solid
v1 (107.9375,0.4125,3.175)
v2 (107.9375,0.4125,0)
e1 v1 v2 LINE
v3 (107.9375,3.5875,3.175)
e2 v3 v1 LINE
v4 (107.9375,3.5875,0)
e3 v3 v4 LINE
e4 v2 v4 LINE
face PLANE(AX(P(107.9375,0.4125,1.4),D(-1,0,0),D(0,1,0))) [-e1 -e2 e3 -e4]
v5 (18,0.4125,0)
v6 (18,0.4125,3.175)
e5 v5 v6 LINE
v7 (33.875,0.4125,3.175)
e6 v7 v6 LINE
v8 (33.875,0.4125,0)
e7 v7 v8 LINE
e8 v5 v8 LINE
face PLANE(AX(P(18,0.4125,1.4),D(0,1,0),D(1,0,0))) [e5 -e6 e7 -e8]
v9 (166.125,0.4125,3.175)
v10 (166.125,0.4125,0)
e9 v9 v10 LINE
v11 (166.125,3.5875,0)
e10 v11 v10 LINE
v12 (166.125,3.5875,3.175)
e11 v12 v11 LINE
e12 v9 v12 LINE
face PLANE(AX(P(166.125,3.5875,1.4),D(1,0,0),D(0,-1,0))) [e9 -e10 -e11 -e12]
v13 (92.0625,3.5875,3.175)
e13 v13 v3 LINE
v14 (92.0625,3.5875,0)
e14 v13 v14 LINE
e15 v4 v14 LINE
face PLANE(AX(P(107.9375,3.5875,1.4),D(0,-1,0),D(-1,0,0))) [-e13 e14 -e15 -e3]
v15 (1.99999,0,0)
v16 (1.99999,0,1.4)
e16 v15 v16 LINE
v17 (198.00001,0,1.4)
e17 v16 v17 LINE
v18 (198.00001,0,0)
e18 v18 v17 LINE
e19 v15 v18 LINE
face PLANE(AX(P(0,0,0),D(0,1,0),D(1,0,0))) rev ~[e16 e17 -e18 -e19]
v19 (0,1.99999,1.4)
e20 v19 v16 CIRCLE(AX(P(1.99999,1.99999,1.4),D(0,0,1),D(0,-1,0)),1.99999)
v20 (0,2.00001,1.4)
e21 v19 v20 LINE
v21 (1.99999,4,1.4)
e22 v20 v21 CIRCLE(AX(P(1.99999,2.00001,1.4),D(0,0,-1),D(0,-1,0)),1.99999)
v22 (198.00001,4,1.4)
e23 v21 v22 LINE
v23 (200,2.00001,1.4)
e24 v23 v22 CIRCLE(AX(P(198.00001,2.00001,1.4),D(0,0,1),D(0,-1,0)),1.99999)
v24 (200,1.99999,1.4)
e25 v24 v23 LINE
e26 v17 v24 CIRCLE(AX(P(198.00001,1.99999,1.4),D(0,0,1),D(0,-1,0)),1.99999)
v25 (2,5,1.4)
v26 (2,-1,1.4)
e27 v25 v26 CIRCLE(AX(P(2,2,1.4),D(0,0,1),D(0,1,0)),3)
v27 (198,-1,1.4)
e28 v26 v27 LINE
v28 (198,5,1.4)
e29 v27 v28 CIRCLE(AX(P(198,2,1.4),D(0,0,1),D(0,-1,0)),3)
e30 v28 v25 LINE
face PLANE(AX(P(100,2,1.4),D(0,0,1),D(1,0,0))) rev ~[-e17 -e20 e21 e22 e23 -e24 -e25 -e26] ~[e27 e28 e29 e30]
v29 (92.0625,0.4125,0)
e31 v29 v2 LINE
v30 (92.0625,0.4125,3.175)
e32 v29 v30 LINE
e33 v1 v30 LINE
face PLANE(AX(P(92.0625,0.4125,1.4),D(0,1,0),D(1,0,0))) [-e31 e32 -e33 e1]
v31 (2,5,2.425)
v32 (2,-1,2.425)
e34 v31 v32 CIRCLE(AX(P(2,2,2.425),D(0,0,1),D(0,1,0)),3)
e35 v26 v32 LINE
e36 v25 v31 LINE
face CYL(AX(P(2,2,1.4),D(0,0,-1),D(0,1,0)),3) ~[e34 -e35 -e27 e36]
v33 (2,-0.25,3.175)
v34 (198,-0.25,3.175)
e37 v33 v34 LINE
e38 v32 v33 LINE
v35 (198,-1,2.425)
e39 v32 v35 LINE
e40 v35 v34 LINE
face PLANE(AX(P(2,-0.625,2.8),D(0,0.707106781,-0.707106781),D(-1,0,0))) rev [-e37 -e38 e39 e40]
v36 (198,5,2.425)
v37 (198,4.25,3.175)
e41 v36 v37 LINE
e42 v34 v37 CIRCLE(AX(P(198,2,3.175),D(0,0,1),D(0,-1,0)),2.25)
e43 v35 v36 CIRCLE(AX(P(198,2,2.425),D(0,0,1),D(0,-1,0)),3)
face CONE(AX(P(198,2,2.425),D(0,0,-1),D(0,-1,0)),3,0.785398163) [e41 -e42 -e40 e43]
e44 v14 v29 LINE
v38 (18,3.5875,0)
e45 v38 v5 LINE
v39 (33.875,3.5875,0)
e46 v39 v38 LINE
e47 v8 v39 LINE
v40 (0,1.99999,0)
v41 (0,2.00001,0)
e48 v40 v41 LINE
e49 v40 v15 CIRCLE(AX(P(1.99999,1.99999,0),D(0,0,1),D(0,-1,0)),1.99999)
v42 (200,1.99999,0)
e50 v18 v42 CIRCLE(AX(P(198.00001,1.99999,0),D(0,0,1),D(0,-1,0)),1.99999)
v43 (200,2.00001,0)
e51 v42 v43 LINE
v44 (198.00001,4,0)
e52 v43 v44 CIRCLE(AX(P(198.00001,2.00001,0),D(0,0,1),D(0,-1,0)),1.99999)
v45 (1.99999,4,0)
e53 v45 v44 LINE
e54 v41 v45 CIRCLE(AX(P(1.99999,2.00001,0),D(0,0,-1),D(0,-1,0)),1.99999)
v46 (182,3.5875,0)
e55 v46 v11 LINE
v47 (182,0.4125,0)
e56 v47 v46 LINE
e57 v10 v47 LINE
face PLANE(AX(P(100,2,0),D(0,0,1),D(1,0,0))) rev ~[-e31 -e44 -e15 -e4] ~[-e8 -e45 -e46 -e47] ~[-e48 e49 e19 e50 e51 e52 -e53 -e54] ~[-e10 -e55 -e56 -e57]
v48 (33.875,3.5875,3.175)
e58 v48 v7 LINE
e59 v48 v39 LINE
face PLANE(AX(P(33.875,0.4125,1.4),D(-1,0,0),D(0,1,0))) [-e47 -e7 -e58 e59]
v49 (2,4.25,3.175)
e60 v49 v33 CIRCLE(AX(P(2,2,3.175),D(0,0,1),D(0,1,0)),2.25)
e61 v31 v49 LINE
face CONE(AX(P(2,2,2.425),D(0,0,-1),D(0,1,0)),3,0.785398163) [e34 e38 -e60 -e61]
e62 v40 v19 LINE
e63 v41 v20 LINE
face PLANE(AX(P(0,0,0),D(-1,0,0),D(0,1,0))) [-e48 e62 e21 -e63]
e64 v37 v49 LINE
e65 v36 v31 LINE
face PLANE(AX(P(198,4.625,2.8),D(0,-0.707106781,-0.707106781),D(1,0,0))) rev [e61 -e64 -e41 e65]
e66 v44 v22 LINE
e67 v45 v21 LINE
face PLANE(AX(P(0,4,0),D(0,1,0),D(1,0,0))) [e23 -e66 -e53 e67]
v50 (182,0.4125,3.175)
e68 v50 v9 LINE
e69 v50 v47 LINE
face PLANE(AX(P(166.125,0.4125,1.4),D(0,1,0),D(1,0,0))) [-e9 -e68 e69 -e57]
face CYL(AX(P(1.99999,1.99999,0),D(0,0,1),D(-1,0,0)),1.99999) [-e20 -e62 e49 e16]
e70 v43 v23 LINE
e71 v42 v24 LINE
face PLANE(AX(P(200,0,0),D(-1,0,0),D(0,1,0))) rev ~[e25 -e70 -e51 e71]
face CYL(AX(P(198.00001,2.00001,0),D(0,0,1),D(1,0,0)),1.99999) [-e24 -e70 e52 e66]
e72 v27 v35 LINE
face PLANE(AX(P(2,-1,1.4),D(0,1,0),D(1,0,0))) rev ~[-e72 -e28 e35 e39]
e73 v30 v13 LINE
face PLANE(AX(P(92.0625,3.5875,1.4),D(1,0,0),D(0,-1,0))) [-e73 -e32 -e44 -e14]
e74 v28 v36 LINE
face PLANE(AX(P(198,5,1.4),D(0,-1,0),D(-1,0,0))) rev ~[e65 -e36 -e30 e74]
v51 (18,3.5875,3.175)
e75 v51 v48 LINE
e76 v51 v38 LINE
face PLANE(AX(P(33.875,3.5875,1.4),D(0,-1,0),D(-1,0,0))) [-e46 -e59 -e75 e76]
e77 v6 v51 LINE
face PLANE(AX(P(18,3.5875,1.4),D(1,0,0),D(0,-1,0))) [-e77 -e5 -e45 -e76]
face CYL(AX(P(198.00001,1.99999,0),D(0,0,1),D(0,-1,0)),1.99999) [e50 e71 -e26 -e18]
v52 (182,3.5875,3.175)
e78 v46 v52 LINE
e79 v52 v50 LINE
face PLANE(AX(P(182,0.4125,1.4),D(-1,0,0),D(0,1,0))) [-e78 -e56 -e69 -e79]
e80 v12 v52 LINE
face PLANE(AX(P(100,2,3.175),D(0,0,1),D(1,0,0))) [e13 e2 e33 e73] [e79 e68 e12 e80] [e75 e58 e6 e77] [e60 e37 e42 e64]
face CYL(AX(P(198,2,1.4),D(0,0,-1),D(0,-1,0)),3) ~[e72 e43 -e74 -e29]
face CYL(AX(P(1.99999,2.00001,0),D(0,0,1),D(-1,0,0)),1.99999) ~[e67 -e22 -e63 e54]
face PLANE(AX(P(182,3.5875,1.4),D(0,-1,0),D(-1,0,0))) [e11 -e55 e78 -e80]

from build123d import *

# Parameters (mm, degrees)
F0_W          = 200
F0_H          = 4
F1_DEPTH      = 1.4
F2_R          = 1.99999
F5_DEPTH      = 1.775
F6_SIZE       = 0.75
F7_DEPTH      = 1.4
F7_DEPTH_BACK = 25


# Not quite as in the source:
# - a fillet or chamfer is up to 0.001 mm smaller than in the source, because OpenCascade refuses the exact size


with BuildPart() as f1:
    # F0 (on Top) → F1 (new body)
    with BuildSketch(Plane.XY):
        with Locations((100, 2)):
            Rectangle(F0_W, F0_H)
    extrude(amount=F1_DEPTH)

    # F2 (radius 2 in the source; OpenCascade refuses exactly that, so slightly less here)
    f2_edges = [f1.edges().sort_by_distance(p)[0] for p in [
        (0, 0, 0.7),
        (0, 4, 0.7),
        (200, 0, 0.7),
        (200, 4, 0.7),
    ]]
    fillet(f2_edges, radius=F2_R)

    # F4 (on face) → F5 (join)
    with BuildSketch(Plane.XY.offset(1.4)):
        with BuildLine():
            Line((198, 5), (2, 5))
            ThreePointArc((2, 5), (-1, 2), (2, -1))
            Line((2, -1), (198, -1))
            ThreePointArc((198, -1), (201, 2), (198, 5))
        make_face()
    extrude(amount=F5_DEPTH)

    # F6
    f6_edges = [f1.edges().sort_by_distance(p)[0] for p in [
        (-1, 2, 3.175),
    ]]
    chamfer(f6_edges, length=F6_SIZE)

    # F3 (on face) → F7 (cut, two sides)
    with BuildSketch(Plane.XY.offset(1.4)) as f7_sk:
        Polygon((18, 3.5875), (18, 2), (18, 0.4125), (33.875, 0.4125), (33.875, 3.5875), align=None)
        Polygon((182, 0.4125), (182, 2), (182, 3.5875), (166.125, 3.5875), (166.125, 0.4125), align=None)
        Polygon((92.0625, 3.5875), (92.0625, 2), (92.0625, 0.4125), (107.9375, 0.4125), (107.9375, 3.5875), align=None)
    extrude(amount=-F7_DEPTH, mode=Mode.SUBTRACT)
    extrude(f7_sk.sketch, amount=F7_DEPTH_BACK, mode=Mode.SUBTRACT)


solid = f1.part
